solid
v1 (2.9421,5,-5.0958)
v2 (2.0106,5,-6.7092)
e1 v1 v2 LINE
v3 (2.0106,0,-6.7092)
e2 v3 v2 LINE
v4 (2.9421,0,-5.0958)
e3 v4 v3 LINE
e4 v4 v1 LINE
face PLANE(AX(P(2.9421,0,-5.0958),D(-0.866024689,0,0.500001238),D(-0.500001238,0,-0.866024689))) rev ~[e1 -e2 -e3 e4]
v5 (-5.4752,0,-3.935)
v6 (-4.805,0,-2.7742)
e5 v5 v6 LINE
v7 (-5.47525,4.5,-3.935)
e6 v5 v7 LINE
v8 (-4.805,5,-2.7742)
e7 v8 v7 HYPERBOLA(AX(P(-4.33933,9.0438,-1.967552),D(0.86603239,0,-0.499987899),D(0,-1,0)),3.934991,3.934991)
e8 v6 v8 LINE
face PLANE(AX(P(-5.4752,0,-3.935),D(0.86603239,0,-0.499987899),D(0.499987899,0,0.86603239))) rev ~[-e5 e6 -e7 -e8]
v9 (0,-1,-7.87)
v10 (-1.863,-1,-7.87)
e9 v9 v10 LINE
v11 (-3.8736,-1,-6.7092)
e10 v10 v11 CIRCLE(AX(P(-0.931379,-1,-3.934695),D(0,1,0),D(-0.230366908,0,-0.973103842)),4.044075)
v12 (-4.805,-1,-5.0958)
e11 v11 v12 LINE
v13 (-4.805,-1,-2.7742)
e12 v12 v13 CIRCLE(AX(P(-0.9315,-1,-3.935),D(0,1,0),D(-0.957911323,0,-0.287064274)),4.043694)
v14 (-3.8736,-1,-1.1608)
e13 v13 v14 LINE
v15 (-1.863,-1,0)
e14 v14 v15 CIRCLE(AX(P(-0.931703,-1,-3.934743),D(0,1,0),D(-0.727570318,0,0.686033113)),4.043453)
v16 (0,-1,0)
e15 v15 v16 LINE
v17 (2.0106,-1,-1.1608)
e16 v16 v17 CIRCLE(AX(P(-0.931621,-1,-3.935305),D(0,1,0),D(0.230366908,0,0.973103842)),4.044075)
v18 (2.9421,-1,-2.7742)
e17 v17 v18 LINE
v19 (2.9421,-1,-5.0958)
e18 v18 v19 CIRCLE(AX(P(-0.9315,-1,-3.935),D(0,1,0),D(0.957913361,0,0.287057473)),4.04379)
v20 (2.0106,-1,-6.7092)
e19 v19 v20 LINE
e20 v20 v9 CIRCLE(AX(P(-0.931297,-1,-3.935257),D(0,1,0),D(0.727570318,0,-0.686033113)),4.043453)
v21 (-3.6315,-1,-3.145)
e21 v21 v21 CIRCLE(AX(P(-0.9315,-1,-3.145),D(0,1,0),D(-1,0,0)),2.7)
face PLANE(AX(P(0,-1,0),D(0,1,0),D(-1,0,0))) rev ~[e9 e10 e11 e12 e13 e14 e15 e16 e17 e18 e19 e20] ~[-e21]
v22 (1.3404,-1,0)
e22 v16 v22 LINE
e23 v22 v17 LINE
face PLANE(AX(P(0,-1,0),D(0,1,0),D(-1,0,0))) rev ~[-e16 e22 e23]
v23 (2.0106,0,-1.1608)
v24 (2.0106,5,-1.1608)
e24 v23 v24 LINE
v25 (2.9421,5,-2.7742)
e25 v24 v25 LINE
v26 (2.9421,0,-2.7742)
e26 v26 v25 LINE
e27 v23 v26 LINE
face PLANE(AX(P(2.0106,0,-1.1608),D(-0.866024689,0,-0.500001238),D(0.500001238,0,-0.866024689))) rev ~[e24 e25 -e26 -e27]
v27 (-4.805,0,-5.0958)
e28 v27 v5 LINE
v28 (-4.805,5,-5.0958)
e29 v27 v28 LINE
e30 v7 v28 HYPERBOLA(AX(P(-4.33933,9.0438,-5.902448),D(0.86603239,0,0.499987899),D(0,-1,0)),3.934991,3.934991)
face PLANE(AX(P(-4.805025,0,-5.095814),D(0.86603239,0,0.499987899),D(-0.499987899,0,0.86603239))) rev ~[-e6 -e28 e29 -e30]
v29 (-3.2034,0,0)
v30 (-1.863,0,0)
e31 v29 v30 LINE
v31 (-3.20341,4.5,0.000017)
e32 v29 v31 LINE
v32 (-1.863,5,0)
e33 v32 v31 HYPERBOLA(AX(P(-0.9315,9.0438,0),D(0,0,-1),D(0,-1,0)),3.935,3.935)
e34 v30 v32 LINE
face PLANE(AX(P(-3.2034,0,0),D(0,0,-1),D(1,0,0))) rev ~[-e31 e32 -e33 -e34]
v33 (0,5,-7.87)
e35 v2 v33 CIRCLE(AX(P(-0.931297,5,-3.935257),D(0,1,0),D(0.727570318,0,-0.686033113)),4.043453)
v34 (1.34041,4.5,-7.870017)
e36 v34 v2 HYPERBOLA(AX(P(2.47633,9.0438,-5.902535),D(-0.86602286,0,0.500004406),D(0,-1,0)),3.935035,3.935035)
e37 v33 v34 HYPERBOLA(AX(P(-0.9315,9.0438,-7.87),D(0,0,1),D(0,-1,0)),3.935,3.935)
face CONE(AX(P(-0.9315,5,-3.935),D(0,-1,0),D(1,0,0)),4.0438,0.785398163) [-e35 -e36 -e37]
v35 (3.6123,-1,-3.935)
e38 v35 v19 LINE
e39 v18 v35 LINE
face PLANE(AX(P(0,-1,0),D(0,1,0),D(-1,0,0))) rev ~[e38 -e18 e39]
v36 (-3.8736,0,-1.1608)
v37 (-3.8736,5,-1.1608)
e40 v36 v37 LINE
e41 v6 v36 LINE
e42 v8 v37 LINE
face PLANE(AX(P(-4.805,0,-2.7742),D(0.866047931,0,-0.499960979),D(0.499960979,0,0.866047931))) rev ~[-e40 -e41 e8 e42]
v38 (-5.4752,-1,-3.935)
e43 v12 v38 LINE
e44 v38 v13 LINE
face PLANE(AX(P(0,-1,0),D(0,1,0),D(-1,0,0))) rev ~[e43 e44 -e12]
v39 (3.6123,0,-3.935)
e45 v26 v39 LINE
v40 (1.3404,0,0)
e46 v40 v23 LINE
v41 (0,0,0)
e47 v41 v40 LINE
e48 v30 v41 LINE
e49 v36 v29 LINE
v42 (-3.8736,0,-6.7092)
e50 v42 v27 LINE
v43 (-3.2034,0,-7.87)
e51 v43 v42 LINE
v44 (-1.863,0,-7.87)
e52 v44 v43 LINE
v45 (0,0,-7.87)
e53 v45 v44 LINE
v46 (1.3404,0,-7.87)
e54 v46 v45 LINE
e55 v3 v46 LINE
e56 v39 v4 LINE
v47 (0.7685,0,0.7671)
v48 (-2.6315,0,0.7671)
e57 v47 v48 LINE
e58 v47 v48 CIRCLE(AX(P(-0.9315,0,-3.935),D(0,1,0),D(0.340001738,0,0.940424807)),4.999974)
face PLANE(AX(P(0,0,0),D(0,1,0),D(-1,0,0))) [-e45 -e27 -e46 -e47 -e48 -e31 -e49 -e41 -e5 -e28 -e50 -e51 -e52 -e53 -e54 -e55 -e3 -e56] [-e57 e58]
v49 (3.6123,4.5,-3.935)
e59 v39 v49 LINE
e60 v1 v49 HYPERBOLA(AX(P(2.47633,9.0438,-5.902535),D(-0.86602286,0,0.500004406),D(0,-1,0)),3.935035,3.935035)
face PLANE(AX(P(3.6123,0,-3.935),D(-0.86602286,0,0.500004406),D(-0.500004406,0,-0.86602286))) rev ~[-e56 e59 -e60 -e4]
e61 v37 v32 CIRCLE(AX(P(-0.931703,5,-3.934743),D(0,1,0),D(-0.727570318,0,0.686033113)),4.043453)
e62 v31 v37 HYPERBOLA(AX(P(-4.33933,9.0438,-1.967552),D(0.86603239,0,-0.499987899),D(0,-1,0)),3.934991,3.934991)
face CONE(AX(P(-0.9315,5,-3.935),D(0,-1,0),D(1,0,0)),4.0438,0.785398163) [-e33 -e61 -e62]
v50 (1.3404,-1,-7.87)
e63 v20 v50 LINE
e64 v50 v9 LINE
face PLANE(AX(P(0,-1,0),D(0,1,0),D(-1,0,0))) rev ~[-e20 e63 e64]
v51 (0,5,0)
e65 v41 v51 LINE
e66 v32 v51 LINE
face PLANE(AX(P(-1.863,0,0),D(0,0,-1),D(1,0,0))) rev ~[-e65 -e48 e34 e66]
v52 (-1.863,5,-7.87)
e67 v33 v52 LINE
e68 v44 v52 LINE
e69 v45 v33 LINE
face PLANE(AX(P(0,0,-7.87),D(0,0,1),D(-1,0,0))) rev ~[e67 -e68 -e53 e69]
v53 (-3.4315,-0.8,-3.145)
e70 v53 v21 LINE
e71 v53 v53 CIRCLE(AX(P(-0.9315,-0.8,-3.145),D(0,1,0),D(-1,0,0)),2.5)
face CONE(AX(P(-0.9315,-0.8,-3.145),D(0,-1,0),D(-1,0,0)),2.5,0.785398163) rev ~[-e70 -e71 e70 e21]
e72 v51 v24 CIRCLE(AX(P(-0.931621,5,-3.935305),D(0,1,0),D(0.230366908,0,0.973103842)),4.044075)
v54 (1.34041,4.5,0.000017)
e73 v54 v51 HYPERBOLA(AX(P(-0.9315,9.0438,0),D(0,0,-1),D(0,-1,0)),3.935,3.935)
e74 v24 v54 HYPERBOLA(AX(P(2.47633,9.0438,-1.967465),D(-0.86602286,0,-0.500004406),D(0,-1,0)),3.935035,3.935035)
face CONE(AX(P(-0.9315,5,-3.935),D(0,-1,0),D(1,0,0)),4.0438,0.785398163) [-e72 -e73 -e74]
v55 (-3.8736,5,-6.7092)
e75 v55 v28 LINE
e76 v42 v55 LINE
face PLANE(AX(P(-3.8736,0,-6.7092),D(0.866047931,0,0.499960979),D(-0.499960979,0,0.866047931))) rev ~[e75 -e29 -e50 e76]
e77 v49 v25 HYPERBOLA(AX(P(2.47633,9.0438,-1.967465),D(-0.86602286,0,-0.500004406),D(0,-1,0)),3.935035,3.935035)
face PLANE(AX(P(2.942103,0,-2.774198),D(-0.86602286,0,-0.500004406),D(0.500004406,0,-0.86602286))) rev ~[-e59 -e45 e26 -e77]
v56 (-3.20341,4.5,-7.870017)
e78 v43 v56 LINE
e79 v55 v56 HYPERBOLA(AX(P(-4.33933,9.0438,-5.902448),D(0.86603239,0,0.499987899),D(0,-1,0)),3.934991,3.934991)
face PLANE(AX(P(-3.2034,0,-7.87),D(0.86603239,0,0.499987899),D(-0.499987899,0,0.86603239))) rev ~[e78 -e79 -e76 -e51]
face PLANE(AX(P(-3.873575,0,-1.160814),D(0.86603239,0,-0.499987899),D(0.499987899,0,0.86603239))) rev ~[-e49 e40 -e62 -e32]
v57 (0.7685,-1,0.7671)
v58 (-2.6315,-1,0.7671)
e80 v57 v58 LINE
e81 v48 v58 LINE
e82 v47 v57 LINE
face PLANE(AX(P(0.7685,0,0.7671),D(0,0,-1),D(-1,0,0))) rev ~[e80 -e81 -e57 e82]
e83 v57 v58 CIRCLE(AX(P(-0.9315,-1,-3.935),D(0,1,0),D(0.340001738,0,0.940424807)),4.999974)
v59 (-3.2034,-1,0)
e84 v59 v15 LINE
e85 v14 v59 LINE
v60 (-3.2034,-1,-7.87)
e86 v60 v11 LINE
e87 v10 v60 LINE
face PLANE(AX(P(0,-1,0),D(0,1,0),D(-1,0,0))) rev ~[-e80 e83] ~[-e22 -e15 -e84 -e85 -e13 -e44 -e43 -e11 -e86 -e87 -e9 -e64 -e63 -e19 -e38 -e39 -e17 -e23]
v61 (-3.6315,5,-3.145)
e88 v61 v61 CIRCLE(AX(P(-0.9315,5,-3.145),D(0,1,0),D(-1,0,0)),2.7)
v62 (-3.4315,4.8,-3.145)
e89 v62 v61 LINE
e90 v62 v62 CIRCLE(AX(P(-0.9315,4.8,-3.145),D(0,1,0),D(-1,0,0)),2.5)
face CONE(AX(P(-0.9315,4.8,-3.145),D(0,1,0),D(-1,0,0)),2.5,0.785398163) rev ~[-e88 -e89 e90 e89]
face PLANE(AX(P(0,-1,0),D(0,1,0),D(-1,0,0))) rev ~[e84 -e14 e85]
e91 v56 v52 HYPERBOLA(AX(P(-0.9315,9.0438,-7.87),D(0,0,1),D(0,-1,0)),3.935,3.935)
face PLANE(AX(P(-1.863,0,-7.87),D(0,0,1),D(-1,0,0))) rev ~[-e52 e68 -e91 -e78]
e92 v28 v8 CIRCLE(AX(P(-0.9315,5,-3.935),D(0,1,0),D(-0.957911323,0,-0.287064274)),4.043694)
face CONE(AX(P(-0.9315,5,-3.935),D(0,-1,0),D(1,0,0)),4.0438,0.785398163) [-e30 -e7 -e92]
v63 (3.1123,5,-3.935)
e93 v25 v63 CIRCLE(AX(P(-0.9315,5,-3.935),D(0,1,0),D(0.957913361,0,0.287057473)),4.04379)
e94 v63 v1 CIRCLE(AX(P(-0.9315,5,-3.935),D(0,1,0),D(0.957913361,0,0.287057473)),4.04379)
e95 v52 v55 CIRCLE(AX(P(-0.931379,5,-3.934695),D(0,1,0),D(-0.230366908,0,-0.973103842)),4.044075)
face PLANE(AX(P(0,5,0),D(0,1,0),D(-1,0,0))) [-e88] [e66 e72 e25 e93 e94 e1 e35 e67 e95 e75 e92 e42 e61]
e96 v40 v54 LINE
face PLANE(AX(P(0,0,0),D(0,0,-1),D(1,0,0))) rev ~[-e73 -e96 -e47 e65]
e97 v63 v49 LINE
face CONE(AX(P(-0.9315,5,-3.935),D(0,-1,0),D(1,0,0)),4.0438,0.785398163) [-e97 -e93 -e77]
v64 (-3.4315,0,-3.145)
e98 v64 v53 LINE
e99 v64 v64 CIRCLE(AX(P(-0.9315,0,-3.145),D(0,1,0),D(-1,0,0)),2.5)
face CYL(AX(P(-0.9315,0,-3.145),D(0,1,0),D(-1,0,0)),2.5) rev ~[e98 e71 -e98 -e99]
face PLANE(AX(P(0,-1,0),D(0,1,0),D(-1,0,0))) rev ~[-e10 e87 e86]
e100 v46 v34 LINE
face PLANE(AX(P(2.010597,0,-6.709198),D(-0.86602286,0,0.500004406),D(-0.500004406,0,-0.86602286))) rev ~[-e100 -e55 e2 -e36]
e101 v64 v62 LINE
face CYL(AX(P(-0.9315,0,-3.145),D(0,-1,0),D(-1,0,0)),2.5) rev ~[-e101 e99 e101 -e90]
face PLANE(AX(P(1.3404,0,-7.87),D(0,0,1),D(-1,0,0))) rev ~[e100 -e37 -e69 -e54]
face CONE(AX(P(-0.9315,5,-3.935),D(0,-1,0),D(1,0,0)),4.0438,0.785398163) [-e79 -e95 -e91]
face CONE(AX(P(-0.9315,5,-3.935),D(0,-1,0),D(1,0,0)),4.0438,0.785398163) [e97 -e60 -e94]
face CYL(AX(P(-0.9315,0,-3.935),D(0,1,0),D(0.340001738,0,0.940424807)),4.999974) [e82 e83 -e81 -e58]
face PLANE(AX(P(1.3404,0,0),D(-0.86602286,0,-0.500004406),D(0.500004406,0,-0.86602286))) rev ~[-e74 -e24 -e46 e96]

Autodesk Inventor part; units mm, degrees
ref_plane "YZ Plane" through (0, 0, 0) normal (1, 0, 0) x (0, 1, 0)
ref_plane "XZ Plane" through (0, 0, 0) normal (0, 1, 0) x (-1, 0, 0)
sketch "Sketch1" plane through (0, 0, 0) normal (0, 1, 0) x (-1, 0, 0)
  arc A0 (3.8736, -1.1608) -> (1.863, 0) centre (0.9315, -3.935) ccw
  line L0 (1.863, 0) -> (0, 0)
  arc A1 (0, 0) -> (-2.0106, -1.1608) centre (0.9315, -3.935) ccw
  line L1 (-2.0106, -1.1608) -> (-2.9421, -2.7742)
  arc A2 (-2.9421, -2.7742) -> (-2.9421, -5.0958) centre (0.9315, -3.935) ccw
  line L2 (-2.9421, -5.0958) -> (-2.0106, -6.7092)
  arc A3 (-2.0106, -6.7092) -> (0, -7.87) centre (0.9315, -3.935) ccw
  line L3 (0, -7.87) -> (1.863, -7.87)
  arc A4 (1.863, -7.87) -> (3.8736, -6.7092) centre (0.9315, -3.935) ccw
  line L4 (3.8736, -6.7092) -> (4.805, -5.0958)
  arc A5 (4.805, -5.0958) -> (4.805, -2.7742) centre (0.9315, -3.935) ccw
  line L5 (4.805, -2.7742) -> (3.8736, -1.1608)
  circle A6 centre (0.9315, -3.145) radius 2.5
  line L6 (-0.7685, 0.7671) -> (2.6315, 0.7671)
  arc A7 (-0.7685, 0.7671) -> (2.6315, 0.7671) centre (0.9315, -3.935) ccw
  line L7 (-1.3404, 0) -> (-3.6123, -3.935)
  line L8 (3.2034, 0) -> (-1.3404, 0)
  line L9 (5.4752, -3.935) -> (3.2034, 0)
  line L10 (3.2034, -7.87) -> (5.4752, -3.935)
  line L11 (-1.3404, -7.87) -> (3.2034, -7.87)
  line L12 (-3.6123, -3.935) -> (-1.3404, -7.87)
extrude "Extrusion1" add sketch "Sketch1" against normal blind 1 contours L5 A5 L4 A4 L3 A3 L2 A2 L1 A1 L0 A0 | A0 L8 L9 | L9 L10 A5 | A1 L7 L8 | L10 L11 A4 | A2 L12 L7 | L11 L12 A3 | L6 A7
extrude "Extrusion2" add sketch "Sketch1" along normal blind 5 contours L5 A5 L4 A4 L3 A3 L2 A2 L1 A1 L0 A0 | A0 L8 L9 | L9 L10 A5 | A1 L7 L8 | L10 L11 A4 | A2 L12 L7 | L11 L12 A3
ref_plane "Work Plane1" through (1.3404, 0, -3.935) normal (0, 0, -1) x (-1, 0, 0)
sketch "Sketch2" plane through (1.3404, 0, -3.935) normal (0, 0, -1) x (-1, 0, 0)
  line L0 (0, 5) -> (-2.2719, 5) projected
  line L1 (-2.2719, 0) -> (-2.2719, 5) projected
  line L2 (-0.2281, 5) -> (4.7719, 5) projected
  line L3 (0, 5) -> (4.5437, 5) projected
  line L4 (2.2719, 5) -> (2.2719, -2.0706)
  line L5 (-2.2719, 5) -> (0, 5) projected
  line L6 (-1.7719, 5) -> (-2.2719, 4.5)
  line L7 (-2.2719, 5) -> (-2.2719, 4.5)
  line L8 (-2.2719, 5) -> (-1.7719, 5)
  point P0 (1.3404, 0)
  dimension "d7" = 0.5
  dimension "d8" = 0.5
revolve "Revolution1" cut sketch "Sketch2" angle 360 about axis through (-0.9315, 5, -3.935) along (0, -1, 0)
thread "Thread1" size "M5x0.8" class "6H" standard "ANSI Metric M Profile" full length
chamfer "Chamfer1" distance 0.2 angle 45 2 edges at (1.5685, 5, -3.145) (1.5685, -1, -3.145)
properties part number "Mini Eccentric Spacer 6mm" material "Steel"
